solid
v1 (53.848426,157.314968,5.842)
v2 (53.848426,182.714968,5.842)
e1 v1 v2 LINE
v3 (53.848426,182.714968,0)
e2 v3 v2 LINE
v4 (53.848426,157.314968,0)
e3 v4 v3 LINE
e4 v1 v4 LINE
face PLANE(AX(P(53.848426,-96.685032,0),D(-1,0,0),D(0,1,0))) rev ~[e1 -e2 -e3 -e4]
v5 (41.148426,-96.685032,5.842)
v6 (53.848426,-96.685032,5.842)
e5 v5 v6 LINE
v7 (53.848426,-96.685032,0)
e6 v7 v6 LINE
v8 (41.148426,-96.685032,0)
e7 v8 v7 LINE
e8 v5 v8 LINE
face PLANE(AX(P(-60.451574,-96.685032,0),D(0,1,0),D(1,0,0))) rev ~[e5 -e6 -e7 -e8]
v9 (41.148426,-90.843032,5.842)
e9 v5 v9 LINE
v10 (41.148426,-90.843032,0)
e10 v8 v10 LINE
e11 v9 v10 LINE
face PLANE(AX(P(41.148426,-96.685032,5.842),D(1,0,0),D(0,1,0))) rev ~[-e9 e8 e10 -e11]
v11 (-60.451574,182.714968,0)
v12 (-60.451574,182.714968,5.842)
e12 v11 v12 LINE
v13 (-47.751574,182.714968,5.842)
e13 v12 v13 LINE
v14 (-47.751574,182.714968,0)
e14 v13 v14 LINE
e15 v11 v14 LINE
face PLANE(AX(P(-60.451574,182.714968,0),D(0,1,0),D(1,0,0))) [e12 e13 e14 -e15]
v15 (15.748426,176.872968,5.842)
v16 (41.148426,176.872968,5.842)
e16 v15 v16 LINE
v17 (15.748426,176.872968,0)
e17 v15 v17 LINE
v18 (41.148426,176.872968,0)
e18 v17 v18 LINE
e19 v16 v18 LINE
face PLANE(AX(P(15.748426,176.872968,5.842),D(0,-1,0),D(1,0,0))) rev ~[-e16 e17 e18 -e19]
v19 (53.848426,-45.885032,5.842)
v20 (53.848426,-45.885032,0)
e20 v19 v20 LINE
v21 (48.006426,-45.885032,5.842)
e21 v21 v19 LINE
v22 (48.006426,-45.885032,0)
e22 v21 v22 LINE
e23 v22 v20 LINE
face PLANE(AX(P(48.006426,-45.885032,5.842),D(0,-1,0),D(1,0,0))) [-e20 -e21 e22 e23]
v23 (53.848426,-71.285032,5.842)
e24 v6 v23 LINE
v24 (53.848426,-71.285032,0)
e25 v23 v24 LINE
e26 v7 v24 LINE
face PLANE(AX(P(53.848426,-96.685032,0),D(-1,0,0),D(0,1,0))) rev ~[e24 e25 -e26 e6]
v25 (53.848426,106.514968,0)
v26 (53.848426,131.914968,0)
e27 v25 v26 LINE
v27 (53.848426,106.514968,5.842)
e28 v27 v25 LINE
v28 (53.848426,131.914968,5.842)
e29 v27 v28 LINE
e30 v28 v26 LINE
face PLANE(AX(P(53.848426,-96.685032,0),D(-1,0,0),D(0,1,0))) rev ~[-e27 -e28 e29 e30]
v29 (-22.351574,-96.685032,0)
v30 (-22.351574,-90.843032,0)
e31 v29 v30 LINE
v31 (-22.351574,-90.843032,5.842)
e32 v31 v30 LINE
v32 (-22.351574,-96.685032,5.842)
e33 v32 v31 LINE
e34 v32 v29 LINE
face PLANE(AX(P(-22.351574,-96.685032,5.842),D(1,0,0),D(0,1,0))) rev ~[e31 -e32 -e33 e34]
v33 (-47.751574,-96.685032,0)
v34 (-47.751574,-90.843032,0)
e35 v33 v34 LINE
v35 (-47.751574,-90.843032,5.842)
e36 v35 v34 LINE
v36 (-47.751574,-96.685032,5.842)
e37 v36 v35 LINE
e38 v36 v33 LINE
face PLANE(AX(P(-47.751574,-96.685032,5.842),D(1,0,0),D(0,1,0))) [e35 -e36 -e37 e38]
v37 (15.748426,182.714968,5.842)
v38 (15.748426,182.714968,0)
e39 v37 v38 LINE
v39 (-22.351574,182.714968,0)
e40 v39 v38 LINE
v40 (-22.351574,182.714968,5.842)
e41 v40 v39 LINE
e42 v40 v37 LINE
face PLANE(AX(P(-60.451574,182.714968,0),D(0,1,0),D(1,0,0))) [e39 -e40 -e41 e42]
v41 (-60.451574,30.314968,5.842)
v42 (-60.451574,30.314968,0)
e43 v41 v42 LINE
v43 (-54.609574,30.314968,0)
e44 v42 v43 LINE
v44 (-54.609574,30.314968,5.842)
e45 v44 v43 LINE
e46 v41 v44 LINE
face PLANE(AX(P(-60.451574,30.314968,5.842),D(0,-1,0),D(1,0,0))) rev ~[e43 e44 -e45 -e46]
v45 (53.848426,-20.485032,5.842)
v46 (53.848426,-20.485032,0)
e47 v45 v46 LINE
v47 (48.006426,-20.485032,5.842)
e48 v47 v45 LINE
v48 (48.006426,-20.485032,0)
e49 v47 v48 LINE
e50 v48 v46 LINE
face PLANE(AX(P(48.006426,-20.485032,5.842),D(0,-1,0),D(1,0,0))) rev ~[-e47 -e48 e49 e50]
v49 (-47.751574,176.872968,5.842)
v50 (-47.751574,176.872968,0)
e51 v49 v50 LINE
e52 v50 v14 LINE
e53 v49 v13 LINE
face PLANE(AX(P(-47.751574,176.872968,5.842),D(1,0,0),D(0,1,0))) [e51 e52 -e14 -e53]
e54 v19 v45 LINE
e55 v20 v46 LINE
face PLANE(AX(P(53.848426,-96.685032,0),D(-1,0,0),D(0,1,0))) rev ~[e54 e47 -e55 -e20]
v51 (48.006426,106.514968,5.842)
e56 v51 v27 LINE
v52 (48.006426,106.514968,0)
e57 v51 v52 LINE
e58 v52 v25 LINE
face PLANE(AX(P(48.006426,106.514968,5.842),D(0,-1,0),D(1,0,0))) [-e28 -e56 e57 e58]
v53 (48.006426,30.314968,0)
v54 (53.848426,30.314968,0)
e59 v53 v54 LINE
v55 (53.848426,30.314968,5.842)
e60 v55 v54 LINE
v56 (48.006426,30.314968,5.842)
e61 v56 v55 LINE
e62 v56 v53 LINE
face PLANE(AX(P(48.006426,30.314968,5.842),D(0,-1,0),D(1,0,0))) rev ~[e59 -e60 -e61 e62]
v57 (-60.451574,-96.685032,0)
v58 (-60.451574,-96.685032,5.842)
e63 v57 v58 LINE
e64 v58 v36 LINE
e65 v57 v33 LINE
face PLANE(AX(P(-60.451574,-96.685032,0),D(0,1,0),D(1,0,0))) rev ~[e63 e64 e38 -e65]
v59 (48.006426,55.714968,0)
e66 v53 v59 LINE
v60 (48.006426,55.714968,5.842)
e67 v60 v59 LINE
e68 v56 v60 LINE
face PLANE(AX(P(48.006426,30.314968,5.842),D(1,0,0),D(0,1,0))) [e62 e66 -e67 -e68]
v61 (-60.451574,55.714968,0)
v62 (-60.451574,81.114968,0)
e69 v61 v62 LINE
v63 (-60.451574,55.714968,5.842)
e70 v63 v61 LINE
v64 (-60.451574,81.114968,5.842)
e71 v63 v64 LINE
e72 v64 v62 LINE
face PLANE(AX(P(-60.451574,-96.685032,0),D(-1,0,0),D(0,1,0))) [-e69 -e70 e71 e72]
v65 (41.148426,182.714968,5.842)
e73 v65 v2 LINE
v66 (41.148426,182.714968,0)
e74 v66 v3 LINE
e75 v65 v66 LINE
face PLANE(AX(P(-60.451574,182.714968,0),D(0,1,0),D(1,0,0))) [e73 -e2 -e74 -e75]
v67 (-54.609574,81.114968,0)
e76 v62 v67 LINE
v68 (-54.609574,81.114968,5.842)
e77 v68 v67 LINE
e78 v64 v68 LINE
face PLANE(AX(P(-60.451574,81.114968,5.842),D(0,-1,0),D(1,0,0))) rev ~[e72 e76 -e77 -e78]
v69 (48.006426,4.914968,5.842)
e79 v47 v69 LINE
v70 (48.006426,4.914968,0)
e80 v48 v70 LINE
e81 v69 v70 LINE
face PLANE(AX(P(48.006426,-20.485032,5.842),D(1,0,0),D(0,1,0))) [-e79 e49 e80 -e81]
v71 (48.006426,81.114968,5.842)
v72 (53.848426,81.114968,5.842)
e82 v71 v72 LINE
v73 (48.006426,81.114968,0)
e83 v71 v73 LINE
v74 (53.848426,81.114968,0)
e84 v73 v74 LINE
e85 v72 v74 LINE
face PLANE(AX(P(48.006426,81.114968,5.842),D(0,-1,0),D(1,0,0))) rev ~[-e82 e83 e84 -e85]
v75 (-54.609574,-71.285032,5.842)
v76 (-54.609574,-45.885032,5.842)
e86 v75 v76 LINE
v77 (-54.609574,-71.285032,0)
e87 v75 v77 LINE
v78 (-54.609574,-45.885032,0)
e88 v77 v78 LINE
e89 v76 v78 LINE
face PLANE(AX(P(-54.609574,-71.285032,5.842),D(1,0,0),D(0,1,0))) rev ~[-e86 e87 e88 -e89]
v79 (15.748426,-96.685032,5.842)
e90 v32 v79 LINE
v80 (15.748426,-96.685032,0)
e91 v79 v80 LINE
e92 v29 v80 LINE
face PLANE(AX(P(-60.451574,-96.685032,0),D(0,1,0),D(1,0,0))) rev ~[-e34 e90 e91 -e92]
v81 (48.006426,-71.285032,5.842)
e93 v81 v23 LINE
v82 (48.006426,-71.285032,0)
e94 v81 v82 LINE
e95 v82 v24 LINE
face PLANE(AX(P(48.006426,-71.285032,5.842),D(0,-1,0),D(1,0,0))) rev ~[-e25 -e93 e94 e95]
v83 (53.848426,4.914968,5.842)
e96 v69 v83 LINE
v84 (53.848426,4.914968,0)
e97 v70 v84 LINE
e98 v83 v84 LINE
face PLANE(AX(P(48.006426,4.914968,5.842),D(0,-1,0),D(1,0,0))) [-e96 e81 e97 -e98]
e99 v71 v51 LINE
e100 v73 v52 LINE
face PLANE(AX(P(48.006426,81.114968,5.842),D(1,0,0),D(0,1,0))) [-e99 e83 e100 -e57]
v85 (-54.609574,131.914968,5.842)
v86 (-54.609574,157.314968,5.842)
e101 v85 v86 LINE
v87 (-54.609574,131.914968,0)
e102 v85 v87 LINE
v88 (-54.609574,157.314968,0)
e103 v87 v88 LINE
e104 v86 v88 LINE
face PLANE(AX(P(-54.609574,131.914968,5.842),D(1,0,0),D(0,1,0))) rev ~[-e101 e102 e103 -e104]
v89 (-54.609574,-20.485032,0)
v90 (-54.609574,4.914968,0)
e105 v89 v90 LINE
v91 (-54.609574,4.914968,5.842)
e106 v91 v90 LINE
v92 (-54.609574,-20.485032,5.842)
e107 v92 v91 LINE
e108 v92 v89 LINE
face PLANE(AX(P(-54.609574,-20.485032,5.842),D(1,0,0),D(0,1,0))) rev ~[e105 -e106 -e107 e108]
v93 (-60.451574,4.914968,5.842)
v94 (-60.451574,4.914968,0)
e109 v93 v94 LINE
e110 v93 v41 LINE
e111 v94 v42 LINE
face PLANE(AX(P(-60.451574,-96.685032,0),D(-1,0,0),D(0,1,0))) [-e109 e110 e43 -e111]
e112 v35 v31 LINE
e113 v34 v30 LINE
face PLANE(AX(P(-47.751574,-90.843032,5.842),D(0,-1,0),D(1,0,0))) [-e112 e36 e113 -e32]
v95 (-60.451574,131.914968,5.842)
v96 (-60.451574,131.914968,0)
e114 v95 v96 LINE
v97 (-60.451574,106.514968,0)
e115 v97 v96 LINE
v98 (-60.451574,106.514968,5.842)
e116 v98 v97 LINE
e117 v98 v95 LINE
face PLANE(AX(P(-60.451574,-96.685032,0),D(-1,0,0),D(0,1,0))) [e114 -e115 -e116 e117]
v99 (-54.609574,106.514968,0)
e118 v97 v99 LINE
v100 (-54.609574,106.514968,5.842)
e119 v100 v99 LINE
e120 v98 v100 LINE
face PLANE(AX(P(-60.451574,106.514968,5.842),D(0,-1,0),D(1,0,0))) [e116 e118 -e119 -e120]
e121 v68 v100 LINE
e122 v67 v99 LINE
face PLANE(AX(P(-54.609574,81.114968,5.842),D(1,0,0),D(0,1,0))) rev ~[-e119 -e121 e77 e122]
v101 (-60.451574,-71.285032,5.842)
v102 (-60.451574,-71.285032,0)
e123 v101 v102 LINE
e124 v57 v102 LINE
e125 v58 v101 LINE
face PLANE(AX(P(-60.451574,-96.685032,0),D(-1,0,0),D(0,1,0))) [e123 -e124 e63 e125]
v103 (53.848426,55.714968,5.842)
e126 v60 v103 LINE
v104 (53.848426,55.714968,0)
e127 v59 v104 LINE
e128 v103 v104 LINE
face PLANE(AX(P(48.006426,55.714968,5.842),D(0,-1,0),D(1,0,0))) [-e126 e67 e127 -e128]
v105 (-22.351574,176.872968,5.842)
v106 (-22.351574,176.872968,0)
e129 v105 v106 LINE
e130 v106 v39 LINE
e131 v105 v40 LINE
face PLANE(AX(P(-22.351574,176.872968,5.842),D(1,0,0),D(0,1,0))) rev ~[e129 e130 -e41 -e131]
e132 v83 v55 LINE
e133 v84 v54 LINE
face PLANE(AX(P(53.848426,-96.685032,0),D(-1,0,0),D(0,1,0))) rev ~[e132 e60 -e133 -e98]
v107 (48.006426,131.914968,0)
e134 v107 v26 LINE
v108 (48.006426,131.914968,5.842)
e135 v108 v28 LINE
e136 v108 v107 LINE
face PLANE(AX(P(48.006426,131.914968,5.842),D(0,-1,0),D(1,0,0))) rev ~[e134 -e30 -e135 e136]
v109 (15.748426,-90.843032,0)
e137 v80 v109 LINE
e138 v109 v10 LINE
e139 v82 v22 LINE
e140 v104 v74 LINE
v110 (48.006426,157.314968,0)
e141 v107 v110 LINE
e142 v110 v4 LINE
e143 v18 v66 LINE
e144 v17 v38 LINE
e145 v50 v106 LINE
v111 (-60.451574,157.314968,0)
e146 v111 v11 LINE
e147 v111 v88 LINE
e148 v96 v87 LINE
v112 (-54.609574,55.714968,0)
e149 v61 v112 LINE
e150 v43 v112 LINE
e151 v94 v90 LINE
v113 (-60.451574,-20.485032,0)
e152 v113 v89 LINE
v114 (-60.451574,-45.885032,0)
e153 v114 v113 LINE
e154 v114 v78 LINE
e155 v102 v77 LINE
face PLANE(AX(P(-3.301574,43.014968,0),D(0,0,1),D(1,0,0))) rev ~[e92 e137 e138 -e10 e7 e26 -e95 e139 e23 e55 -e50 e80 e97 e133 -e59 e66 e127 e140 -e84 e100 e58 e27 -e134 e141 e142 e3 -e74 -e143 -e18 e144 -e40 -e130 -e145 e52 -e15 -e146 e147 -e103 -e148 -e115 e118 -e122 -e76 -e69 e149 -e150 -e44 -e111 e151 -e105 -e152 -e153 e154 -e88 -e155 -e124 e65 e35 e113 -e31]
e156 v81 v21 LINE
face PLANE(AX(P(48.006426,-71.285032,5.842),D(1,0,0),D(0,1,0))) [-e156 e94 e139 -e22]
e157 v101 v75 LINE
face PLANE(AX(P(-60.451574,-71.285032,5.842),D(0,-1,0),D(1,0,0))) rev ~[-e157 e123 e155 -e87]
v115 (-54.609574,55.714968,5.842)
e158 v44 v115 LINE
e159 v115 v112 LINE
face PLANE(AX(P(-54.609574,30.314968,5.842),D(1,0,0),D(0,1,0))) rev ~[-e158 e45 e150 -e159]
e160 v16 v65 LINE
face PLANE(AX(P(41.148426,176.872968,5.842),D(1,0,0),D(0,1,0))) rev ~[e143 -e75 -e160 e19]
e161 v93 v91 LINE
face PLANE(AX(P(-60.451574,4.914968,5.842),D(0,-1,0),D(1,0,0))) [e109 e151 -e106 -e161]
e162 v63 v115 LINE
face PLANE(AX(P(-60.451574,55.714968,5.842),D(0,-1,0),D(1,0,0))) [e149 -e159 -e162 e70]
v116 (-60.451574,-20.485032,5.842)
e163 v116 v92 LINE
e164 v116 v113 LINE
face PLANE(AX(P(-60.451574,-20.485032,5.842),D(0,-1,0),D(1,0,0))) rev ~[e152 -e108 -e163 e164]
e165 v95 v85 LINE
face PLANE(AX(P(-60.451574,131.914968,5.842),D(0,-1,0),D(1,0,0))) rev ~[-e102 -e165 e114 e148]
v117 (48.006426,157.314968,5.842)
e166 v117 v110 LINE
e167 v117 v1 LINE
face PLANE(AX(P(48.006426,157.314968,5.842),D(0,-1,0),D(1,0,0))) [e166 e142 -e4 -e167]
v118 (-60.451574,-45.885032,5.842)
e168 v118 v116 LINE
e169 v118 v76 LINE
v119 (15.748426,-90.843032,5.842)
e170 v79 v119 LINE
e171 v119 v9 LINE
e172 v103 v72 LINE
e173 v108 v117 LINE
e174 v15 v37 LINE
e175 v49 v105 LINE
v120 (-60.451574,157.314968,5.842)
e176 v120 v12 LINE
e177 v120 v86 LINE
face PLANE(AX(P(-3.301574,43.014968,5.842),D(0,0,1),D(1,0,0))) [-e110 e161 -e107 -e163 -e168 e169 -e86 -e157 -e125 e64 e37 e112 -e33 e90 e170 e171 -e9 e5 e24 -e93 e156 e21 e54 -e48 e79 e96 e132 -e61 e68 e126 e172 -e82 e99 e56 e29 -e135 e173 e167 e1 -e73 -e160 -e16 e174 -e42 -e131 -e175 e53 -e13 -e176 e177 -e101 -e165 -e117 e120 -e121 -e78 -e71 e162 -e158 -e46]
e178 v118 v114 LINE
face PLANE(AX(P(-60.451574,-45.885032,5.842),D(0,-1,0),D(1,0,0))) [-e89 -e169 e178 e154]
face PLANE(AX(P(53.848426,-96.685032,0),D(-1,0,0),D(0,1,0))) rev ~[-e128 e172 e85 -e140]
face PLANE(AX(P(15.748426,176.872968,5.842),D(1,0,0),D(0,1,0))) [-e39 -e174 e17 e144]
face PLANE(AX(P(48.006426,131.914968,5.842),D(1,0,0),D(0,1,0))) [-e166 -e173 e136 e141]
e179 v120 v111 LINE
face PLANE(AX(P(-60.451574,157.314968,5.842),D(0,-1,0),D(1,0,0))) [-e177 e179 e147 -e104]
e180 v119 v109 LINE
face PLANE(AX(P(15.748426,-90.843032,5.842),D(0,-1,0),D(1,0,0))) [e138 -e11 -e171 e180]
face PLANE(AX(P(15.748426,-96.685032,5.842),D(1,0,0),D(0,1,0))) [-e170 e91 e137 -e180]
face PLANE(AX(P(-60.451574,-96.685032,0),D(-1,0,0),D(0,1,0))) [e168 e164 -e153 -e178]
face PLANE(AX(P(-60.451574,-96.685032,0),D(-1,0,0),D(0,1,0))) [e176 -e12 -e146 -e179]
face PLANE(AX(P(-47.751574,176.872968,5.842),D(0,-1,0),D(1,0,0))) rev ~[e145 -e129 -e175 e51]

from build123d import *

# Parameters (mm, degrees)
F0_W     = 114.3
F0_H     = 279.4
F1_DEPTH = 5.842
F2_W     = 5.842
F2_H     = 25.4
F2_W_2   = 25.4
F2_H_2   = 5.842
F3_DEPTH = 5.842


# Not quite as in the source:
# - a feature names something its author has since deleted; it is built from what else it names


with BuildPart() as f1:
    # F0 (on Top) → F1 (new body)
    with BuildSketch(Plane.XY):
        with Locations((-3.3015739173, 43.0149683578)):
            Rectangle(F0_W, F0_H)
    extrude(amount=F1_DEPTH)

    # F2 (on face) → F3 (cut, through all)
    with BuildSketch(Plane.XY.offset(5.842)):
        with Locations((50.9274260827, 93.8149683578)):
            Rectangle(F2_W, F2_H)
        with Locations((-57.5305739173, 93.8149683578)):
            Rectangle(F2_W, F2_H)
        with Locations((-57.5305739173, 43.0149683578)):
            Rectangle(F2_W, F2_H)
        with Locations((50.9274260827, 43.0149683578)):
            Rectangle(F2_W, F2_H)
        with Locations((50.9274260827, -7.7850316422)):
            Rectangle(F2_W, F2_H)
        with Locations((50.9274260827, -58.5850316422)):
            Rectangle(F2_W, F2_H)
        with Locations((28.4484260827, -93.7640316422)):
            Rectangle(F2_W_2, F2_H_2)
        with Locations((-35.0515739173, -93.7640316422)):
            Rectangle(F2_W_2, F2_H_2)
        with Locations((-57.5305739173, -58.5850316422)):
            Rectangle(F2_W, F2_H)
        with Locations((-57.5305739173, -7.7850316422)):
            Rectangle(F2_W, F2_H)
        with Locations((28.4484260827, 179.7939683578)):
            Rectangle(F2_W_2, F2_H_2)
        with Locations((-35.0515739173, 179.7939683578)):
            Rectangle(F2_W_2, F2_H_2)
        with Locations((-57.5305739173, 144.6149683578)):
            Rectangle(F2_W, F2_H)
        with Locations((50.9274260827, 144.6149683578)):
            Rectangle(F2_W, F2_H)
    extrude(amount=-F3_DEPTH, mode=Mode.SUBTRACT)


solid = f1.part
